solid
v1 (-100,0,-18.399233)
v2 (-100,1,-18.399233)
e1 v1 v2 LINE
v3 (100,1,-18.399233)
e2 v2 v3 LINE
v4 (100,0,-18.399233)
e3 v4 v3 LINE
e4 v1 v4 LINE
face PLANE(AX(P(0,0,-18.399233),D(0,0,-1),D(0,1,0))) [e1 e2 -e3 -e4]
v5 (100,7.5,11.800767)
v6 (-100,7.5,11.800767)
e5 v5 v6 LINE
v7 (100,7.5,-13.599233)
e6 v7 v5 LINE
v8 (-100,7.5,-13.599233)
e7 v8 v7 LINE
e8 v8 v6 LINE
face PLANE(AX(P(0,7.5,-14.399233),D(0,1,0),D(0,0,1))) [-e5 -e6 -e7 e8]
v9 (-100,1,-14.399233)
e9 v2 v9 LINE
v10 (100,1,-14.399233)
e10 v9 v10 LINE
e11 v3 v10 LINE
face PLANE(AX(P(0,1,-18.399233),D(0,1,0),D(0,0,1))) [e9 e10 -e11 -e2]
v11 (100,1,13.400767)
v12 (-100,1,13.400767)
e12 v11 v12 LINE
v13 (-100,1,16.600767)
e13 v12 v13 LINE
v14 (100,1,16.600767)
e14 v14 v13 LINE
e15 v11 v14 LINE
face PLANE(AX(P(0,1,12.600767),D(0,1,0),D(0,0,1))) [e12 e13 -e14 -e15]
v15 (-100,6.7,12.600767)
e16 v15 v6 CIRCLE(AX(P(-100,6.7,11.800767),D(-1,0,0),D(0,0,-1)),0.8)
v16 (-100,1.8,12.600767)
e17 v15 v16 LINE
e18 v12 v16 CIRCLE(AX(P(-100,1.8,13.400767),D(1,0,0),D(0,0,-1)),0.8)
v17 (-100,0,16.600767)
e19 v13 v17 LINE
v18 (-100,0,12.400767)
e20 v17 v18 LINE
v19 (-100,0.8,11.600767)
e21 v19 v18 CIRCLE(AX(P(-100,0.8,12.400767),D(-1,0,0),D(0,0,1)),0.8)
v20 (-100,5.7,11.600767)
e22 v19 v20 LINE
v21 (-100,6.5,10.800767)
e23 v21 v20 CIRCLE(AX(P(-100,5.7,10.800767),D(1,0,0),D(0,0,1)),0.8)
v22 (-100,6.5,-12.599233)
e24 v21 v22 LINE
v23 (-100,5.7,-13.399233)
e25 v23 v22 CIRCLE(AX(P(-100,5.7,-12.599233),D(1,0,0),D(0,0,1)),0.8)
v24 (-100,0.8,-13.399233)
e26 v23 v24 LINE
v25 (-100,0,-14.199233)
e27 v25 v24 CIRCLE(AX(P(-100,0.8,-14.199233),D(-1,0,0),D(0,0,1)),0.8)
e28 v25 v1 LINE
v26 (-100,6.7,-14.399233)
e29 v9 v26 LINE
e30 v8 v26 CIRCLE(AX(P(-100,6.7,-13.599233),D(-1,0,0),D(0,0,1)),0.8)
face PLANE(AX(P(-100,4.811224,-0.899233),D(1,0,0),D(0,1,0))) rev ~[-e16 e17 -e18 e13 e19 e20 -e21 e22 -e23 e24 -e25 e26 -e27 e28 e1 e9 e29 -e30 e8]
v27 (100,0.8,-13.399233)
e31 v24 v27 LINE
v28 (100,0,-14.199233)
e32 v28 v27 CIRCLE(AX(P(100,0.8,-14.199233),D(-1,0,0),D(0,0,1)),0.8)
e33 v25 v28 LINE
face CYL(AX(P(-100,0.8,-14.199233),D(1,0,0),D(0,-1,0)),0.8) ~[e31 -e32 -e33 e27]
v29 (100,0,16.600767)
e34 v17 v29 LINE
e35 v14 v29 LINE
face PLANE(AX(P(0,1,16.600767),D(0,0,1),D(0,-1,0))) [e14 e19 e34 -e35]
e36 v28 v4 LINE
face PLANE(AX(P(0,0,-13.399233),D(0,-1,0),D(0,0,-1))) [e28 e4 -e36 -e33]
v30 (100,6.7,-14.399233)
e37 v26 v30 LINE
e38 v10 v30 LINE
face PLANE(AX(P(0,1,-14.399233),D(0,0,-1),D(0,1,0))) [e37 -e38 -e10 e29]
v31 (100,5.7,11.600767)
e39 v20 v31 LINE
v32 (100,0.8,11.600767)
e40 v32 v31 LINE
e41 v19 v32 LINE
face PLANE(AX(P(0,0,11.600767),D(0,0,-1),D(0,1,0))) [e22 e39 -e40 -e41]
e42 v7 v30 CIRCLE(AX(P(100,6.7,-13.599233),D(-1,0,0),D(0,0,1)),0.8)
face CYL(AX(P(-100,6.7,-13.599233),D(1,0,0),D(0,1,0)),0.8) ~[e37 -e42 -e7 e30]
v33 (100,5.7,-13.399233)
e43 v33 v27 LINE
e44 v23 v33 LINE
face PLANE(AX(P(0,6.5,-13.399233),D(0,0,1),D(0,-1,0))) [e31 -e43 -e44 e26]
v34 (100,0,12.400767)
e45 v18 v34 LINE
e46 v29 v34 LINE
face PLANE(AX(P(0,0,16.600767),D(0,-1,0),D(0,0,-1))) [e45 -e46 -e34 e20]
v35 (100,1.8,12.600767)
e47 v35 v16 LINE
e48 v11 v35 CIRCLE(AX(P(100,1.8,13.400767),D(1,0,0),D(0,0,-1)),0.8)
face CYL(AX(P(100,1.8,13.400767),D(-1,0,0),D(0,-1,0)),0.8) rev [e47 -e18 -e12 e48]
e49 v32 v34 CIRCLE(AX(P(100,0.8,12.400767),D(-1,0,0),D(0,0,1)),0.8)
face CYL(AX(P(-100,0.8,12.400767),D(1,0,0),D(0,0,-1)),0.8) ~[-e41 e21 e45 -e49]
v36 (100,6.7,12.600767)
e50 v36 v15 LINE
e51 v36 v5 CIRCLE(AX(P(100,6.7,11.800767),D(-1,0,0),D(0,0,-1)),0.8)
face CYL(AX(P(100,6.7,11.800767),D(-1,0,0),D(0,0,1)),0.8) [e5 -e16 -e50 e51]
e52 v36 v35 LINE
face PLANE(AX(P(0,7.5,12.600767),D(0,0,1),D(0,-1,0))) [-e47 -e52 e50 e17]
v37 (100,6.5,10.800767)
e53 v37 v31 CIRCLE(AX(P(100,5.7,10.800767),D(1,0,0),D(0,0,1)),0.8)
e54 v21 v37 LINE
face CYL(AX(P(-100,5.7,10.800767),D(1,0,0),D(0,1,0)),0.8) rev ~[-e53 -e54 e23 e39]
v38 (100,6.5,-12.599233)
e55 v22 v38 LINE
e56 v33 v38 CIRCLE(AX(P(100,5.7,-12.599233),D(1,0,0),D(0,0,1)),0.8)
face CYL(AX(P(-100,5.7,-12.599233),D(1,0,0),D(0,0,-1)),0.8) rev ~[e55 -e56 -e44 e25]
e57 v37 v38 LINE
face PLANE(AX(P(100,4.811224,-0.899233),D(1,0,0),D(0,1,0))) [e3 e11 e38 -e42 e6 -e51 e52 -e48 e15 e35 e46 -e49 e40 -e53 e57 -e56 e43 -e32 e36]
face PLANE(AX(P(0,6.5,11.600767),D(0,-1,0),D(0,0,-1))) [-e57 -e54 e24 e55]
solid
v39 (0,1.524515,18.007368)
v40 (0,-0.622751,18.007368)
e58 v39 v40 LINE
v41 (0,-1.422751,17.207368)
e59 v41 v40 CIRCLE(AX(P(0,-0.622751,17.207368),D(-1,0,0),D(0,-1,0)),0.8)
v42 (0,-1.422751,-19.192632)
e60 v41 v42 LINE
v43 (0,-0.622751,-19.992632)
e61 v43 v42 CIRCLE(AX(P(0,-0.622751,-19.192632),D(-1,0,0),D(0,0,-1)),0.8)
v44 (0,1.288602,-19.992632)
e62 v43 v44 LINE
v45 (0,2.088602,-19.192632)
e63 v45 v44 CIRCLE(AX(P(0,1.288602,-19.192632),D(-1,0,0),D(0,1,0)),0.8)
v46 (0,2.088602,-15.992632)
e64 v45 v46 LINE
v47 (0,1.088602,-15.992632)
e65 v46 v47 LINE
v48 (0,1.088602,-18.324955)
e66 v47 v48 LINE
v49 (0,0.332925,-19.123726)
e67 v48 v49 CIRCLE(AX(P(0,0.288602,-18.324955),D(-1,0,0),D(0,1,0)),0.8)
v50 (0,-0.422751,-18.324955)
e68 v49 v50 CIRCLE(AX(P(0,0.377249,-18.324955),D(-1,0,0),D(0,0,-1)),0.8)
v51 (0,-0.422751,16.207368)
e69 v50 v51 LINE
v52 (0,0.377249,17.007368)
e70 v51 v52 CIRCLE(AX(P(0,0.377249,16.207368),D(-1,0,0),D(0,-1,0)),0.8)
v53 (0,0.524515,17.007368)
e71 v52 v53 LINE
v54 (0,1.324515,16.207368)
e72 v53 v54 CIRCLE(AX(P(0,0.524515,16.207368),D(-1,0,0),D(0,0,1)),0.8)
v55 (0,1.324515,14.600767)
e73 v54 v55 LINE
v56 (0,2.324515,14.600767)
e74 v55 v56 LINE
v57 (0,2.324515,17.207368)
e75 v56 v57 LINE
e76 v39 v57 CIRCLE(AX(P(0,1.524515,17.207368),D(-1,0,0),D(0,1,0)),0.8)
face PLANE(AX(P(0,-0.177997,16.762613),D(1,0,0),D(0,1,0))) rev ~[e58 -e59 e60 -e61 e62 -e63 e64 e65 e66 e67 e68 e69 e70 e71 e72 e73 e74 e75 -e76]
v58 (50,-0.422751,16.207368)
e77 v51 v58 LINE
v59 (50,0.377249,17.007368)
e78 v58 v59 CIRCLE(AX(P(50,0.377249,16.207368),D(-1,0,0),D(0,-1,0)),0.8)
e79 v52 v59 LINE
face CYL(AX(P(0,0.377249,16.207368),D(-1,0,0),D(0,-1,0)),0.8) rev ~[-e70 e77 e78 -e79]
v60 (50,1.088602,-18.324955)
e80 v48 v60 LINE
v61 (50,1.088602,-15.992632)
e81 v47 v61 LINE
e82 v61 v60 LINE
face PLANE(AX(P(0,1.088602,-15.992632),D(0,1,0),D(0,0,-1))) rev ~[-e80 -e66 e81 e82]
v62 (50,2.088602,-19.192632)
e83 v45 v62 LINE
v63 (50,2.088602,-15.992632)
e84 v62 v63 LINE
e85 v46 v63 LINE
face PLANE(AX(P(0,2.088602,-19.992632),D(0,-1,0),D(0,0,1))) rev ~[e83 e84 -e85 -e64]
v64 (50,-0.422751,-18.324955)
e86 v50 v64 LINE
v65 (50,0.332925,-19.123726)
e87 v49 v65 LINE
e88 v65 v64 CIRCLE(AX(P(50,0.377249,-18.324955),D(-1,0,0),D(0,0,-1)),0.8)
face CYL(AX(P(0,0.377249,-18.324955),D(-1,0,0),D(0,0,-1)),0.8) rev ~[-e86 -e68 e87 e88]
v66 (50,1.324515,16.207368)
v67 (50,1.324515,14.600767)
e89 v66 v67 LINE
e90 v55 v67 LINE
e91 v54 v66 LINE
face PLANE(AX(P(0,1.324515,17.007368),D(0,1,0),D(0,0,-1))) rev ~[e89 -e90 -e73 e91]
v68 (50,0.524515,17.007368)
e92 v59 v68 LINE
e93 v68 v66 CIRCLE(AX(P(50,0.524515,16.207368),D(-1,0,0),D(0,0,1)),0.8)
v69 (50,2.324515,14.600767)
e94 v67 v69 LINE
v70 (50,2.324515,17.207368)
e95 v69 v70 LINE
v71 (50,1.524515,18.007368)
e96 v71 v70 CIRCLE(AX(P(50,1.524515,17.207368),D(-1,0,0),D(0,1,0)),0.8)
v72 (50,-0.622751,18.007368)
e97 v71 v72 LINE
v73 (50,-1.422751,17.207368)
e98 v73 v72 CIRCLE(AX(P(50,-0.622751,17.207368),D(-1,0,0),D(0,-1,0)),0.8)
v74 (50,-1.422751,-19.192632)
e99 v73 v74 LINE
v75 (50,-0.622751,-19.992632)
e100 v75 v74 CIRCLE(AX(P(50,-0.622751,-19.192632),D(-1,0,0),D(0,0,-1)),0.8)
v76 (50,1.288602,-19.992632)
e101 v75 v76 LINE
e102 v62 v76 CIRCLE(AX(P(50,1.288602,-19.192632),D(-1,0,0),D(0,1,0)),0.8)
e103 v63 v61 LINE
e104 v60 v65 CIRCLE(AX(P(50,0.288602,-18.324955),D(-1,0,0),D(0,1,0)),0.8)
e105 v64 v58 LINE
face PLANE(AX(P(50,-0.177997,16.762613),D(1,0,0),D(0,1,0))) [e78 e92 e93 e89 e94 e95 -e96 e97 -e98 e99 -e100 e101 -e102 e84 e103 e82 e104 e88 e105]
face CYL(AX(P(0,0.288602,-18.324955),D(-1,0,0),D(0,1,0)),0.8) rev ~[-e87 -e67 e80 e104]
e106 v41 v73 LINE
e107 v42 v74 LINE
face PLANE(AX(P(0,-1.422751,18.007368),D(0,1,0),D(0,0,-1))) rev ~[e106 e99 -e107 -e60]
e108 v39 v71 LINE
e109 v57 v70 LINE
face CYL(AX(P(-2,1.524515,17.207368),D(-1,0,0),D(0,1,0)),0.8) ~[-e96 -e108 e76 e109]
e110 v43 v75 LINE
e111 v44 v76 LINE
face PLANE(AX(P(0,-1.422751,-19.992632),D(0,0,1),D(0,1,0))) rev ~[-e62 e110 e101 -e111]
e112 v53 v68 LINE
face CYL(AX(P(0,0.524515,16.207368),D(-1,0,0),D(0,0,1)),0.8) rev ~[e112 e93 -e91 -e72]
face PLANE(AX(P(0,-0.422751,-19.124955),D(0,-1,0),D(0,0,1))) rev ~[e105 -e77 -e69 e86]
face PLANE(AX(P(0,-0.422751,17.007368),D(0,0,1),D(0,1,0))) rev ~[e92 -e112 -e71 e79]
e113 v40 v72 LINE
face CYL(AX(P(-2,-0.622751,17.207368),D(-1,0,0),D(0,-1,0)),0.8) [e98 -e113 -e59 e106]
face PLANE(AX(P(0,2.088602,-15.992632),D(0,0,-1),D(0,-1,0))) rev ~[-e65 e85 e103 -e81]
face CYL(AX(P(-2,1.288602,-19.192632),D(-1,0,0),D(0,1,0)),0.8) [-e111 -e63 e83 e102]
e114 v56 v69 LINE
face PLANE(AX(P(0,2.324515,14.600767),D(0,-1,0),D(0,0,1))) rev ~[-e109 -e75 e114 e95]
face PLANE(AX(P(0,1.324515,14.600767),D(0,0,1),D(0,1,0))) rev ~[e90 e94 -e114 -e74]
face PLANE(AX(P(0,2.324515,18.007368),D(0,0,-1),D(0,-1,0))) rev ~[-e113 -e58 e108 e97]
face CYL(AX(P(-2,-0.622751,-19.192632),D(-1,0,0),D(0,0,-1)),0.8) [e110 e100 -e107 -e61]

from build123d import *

# Parameters (mm, degrees)
F1_DEPTH    = 100
F2_R        = 0.8
F3_DEPTH    = 50
F4_T1_DEPTH = 50
F4_T3_DEPTH = 54


# Not quite as in the source:
# - a fillet or chamfer that OpenCascade refuses, or shapes differently, is made with other operations: its cross-section is extruded or revolved along the edge and cut away or added


with BuildPart() as f1:
    # F0 (on Right) → F1 (new body, symmetric)
    with BuildSketch(Plane.YZ):
        Polygon((1, 16.6007670015), (0, 16.6007670015), (0, 11.6007670015), (6.5, 11.6007670015), (6.5, -13.3992329985), (0, -13.3992329985), (0, -18.3992329985), (1, -18.3992329985), (1, -14.3992329985), (7.5, -14.3992329985), (7.5, 12.6007670015), (1, 12.6007670015), align=None)
    extrude(amount=F1_DEPTH, both=True)

    # F2
    f2_edges = [f1.edges().sort_by_distance(p)[0] for p in [
        (0, 1, 12.600767),
        (0, 0, 11.600767),
        (0, 7.5, 12.600767),
        (0, 6.5, 11.600767),
        (0, 7.5, -14.399233),
        (0, 0, -13.399233),
        (0, 6.5, -13.399233),
    ]]
    fillet(f2_edges, radius=F2_R)


with BuildPart() as f3:
    # F0 (on Right) → F3 (new body)
    with BuildSketch(Plane.YZ):
        Polygon((1.3245146256, 17.0073675215), (1.3245146256, 14.6007670015), (2.3245146256, 14.6007670015), (2.3245146256, 18.0073675215), (-1.4227514728, 18.0073675215), (-1.4227514728, -19.9926324785), (2.0886021191, -19.9926324785), (2.0886021191, -15.9926324785), (1.0886021191, -15.9926324785), (1.0886021191, -19.1249549389), (-0.4227514728, -19.1249549389), (-0.4227514728, 17.0073675215), align=None)
    extrude(amount=F3_DEPTH)

    # F4: fillet of radius 0.8 on 8 edges, made by hand

    # F4_s2 → F4_t1 (join)
    with BuildSketch(Plane.YZ):
        with BuildLine():
            ThreePointArc((-0.4227514728, 16.2073675215), (-0.1884368977, 16.7730529465), (0.3772485272, 17.0073675215))
            Line((0.3772485272, 17.0073675215), (-0.4227514728, 17.0073675215))
            Line((-0.4227514728, 17.0073675215), (-0.4227514728, 16.2073675215))
        make_face()
        with BuildLine():
            ThreePointArc((0.5245146256, 17.0073675215), (1.0902000505, 16.7730529465), (1.3245146256, 16.2073675215))
            Line((1.3245146256, 16.2073675215), (1.3245146256, 17.0073675215))
            Line((1.3245146256, 17.0073675215), (0.5245146256, 17.0073675215))
        make_face()
        with BuildLine():
            ThreePointArc((0.3772485272, -19.1249549389), (-0.1884368977, -18.8906403638), (-0.4227514728, -18.3249549389))
            Line((-0.4227514728, -18.3249549389), (-0.4227514728, -19.1249549389))
            Line((-0.4227514728, -19.1249549389), (0.3772485272, -19.1249549389))
        make_face()
        with BuildLine():
            ThreePointArc((1.0886021191, -18.3249549389), (0.8542875441, -18.8906403638), (0.2886021191, -19.1249549389))
            Line((0.2886021191, -19.1249549389), (1.0886021191, -19.1249549389))
            Line((1.0886021191, -19.1249549389), (1.0886021191, -18.3249549389))
        make_face()
    extrude(amount=F4_T1_DEPTH)

    # F4_s4 → F4_t3 (cut)
    with BuildSketch(Plane.YZ.offset(-2)):
        with BuildLine():
            ThreePointArc((-1.4227514728, 17.2073675215), (-1.1884368977, 17.7730529465), (-0.6227514728, 18.0073675215))
            Line((-0.6227514728, 18.0073675215), (-1.4227514728, 18.0073675215))
            Line((-1.4227514728, 18.0073675215), (-1.4227514728, 17.2073675215))
        make_face()
        with BuildLine():
            ThreePointArc((2.3245146256, 17.2073675215), (2.0902000505, 17.7730529465), (1.5245146256, 18.0073675215))
            Line((1.5245146256, 18.0073675215), (2.3245146256, 18.0073675215))
            Line((2.3245146256, 18.0073675215), (2.3245146256, 17.2073675215))
        make_face()
        with BuildLine():
            ThreePointArc((-0.6227514728, -19.9926324785), (-1.1884368977, -19.7583179034), (-1.4227514728, -19.1926324785))
            Line((-1.4227514728, -19.1926324785), (-1.4227514728, -19.9926324785))
            Line((-1.4227514728, -19.9926324785), (-0.6227514728, -19.9926324785))
        make_face()
        with BuildLine():
            ThreePointArc((2.0886021191, -19.1926324785), (1.8542875441, -19.7583179034), (1.2886021191, -19.9926324785))
            Line((1.2886021191, -19.9926324785), (2.0886021191, -19.9926324785))
            Line((2.0886021191, -19.9926324785), (2.0886021191, -19.1926324785))
        make_face()
    extrude(amount=F4_T3_DEPTH, mode=Mode.SUBTRACT)


solid = Compound([f1.part, f3.part])
